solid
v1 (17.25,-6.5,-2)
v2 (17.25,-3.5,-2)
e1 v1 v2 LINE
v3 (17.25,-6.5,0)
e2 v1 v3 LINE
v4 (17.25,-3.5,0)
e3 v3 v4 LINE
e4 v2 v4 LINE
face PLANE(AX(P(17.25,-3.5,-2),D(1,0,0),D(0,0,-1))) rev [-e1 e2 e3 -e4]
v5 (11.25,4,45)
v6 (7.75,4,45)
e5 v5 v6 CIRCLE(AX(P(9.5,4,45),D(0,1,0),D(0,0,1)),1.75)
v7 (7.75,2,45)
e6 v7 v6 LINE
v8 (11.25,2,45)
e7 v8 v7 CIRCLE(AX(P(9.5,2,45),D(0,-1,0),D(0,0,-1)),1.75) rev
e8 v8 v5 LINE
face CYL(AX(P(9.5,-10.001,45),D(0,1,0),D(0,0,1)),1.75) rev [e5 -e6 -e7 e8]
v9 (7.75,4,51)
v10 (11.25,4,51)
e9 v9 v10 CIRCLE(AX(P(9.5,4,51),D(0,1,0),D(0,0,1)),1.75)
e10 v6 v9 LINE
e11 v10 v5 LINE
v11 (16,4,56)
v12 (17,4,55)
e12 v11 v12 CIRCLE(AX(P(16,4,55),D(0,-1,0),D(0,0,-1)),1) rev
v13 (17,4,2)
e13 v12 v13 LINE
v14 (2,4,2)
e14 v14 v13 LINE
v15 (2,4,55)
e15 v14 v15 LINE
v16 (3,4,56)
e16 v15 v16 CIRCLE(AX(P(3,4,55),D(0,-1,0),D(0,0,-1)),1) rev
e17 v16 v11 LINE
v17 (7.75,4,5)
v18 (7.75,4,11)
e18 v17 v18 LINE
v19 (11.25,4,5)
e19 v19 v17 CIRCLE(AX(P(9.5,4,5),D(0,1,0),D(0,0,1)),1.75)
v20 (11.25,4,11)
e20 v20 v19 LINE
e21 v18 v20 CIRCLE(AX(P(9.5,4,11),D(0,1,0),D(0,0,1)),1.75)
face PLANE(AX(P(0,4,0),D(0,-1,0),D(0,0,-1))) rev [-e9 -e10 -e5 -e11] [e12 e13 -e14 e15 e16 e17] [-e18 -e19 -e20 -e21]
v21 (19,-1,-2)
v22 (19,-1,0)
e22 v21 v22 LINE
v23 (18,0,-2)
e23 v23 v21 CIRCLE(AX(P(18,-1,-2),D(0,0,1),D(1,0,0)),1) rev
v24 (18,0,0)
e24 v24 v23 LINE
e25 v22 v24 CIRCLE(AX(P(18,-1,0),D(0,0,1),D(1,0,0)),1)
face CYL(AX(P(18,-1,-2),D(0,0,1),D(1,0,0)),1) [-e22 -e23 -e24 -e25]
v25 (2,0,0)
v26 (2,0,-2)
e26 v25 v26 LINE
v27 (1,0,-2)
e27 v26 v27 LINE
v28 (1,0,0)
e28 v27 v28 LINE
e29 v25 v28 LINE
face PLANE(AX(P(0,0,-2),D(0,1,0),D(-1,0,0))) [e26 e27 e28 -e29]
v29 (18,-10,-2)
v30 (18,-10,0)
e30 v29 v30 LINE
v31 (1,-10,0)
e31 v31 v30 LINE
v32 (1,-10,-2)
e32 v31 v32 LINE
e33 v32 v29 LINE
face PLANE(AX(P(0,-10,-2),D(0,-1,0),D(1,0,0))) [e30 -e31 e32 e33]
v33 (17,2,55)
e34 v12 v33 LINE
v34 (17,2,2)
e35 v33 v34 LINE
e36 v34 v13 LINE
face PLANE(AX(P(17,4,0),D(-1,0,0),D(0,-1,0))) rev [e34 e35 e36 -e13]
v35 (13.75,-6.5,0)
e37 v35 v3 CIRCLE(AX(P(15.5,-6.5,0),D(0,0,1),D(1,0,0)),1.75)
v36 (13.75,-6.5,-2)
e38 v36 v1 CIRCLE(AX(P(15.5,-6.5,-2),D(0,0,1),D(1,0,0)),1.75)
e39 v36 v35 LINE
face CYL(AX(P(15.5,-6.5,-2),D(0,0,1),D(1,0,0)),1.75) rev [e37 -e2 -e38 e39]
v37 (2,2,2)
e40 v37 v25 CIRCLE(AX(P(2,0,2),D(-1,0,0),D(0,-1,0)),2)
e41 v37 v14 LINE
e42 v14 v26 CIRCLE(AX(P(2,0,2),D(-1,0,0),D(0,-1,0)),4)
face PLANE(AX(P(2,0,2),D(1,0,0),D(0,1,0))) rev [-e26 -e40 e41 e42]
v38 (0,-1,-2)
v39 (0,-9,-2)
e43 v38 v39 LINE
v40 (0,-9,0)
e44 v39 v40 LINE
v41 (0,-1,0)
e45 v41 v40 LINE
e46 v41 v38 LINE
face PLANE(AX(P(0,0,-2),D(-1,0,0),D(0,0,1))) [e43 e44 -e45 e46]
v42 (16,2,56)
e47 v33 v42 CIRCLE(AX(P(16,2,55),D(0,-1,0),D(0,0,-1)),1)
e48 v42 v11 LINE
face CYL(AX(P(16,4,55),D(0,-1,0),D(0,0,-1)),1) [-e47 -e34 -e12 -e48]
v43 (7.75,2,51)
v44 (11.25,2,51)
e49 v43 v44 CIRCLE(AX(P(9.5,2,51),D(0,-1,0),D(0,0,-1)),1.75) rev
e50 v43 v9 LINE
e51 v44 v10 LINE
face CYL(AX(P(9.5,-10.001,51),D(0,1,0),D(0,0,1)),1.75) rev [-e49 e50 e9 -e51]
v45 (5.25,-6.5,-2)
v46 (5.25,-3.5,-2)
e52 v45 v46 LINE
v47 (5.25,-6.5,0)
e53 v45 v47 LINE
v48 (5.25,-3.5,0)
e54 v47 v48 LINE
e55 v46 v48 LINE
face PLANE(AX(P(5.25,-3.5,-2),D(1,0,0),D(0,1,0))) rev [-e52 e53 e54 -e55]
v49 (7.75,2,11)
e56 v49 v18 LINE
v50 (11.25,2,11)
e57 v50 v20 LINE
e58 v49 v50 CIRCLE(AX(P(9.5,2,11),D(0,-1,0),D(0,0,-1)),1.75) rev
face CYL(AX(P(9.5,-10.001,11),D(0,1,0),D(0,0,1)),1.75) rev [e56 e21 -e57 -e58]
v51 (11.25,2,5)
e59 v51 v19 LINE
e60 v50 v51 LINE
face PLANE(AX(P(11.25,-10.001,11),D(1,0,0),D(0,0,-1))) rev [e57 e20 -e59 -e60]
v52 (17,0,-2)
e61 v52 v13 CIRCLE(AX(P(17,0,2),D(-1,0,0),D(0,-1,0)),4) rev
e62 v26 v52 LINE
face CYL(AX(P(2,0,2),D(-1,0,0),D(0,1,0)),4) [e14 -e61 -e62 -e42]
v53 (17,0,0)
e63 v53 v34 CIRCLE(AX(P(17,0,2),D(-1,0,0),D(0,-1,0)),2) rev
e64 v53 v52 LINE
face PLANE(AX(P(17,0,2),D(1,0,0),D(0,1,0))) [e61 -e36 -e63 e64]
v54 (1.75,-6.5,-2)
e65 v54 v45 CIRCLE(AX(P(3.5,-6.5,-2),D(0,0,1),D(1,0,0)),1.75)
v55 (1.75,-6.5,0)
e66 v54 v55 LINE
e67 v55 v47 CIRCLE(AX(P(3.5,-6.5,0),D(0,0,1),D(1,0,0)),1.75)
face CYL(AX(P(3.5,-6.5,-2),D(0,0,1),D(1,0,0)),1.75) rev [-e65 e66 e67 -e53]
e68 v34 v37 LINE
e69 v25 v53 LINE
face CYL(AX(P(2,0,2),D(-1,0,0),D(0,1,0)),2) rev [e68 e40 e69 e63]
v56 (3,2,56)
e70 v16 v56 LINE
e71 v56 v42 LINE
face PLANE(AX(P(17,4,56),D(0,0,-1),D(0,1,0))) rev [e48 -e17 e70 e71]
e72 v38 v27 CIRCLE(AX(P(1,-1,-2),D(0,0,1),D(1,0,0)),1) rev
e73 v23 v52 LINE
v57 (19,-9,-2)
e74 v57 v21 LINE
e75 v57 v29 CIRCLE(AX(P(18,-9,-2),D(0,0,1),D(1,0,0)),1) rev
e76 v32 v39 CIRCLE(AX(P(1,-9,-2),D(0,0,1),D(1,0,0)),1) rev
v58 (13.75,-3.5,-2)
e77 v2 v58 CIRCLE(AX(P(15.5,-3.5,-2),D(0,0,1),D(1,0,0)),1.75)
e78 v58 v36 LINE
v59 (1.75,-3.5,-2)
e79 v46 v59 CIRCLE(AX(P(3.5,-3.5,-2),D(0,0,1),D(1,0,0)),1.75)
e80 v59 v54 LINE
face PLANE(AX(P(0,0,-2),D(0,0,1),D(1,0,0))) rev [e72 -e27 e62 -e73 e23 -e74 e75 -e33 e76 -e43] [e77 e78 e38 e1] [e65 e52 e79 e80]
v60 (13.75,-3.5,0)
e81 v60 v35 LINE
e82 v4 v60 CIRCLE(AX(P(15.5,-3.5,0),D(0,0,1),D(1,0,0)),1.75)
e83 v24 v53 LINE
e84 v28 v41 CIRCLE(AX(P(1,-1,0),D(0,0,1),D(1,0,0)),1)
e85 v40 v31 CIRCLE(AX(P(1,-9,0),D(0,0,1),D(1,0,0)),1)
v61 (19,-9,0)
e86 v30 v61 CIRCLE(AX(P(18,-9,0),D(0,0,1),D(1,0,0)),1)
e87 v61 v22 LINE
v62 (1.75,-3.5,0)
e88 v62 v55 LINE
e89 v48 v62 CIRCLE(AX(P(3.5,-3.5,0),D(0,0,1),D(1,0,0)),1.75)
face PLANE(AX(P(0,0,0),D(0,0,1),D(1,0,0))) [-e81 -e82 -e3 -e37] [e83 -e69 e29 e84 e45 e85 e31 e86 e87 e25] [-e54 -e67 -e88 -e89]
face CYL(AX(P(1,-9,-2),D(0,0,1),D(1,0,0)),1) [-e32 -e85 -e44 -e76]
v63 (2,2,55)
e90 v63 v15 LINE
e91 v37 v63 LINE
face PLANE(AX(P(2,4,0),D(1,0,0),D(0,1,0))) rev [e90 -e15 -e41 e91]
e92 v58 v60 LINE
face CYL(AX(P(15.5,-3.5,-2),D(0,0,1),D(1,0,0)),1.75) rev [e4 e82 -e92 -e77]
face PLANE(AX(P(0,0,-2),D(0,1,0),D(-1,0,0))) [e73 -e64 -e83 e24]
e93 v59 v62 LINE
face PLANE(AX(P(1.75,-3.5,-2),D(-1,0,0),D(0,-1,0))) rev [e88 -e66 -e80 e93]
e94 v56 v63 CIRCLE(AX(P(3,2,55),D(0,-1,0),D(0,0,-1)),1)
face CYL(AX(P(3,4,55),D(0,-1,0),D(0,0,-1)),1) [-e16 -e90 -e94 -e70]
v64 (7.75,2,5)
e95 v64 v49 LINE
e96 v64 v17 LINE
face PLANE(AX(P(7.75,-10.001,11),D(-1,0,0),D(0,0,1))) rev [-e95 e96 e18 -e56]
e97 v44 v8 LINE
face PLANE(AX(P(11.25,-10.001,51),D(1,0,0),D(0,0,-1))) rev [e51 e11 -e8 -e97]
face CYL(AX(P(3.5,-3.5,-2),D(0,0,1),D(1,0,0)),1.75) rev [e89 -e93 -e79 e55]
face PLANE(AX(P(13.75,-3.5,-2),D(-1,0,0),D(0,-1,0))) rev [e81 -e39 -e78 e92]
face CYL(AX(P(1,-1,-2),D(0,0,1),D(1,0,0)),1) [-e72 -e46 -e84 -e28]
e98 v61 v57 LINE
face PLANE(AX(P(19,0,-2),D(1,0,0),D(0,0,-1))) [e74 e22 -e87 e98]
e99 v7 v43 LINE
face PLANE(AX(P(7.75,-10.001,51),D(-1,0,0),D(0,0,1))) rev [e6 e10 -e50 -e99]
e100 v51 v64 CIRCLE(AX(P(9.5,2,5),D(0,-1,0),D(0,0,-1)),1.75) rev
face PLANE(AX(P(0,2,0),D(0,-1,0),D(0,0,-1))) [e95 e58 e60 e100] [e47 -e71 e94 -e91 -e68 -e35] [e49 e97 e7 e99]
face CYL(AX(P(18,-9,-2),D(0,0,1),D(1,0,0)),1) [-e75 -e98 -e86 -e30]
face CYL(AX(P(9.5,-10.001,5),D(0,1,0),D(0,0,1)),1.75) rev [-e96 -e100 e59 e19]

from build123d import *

# Parameters (mm, degrees)
CROQUIS1_W             = 19
CROQUIS1_H             = 10
BRIDA_BASE1_DEPTH      = 2
BRIDA_DE_ARISTA1_DEPTH = 15
CORTAR_EXTRUIR1_REACH  = 62.77
REDONDEO1_R            = 1


# Sheet-metal steps are written as plain solids
with BuildPart() as part:
    # Croquis1 → Brida base1 (new body)
    with BuildSketch(Plane.XY):
        with Locations((9.5, -5)):
            Rectangle(CROQUIS1_W, CROQUIS1_H)
        with BuildLine():
            Line((5.25, -3.5), (5.25, -6.5))
            ThreePointArc((5.25, -6.5), (3.5, -8.25), (1.75, -6.5))
            Line((1.75, -6.5), (1.75, -3.5))
            ThreePointArc((1.75, -3.5), (3.5, -1.75), (5.25, -3.5))
        make_face(mode=Mode.SUBTRACT)
        with BuildLine():
            Line((17.25, -3.5), (17.25, -6.5))
            ThreePointArc((17.25, -6.5), (15.5, -8.25), (13.75, -6.5))
            Line((13.75, -6.5), (13.75, -3.5))
            ThreePointArc((13.75, -3.5), (15.5, -1.75), (17.25, -3.5))
        make_face(mode=Mode.SUBTRACT)
    extrude(amount=-BRIDA_BASE1_DEPTH)

    # Brida de arista1 section (across the edge) → Brida de arista1 (add)
    with BuildSketch(Plane(origin=(17, 2, 0), x_dir=(0, -1, 0), z_dir=(-1, 0, 0))):
        with BuildLine():
            Line((-2, 2), (-2, 56))
            Line((-2, 56), (0, 56))
            Line((0, 56), (0, 2))
            ThreePointArc((0, 2), (0.585786438, 0.585786438), (2, 0))
            Line((2, 0), (2, -2))
            ThreePointArc((2, -2), (-0.828427125, -0.828427125), (-2, 2))
        make_face()
    extrude(amount=BRIDA_DE_ARISTA1_DEPTH)

    # Croquis9 → Cortar-Extruir1 (cut, up to next)
    with BuildSketch(Plane(origin=(0, 4, 0), x_dir=(1, 0, 0), z_dir=(0, 1, 0)), mode=Mode.PRIVATE) as cortar_extruir1_sk1:
        with BuildLine():
            Line((7.75, -11), (7.75, -5))
            ThreePointArc((7.75, -5), (9.5, -3.25), (11.25, -5))
            Line((11.25, -5), (11.25, -11))
            ThreePointArc((11.25, -11), (9.5, -12.75), (7.75, -11))
        make_face()
    cortar_extruir1_tool1 = extrude(cortar_extruir1_sk1.sketch, amount=-CORTAR_EXTRUIR1_REACH, mode=Mode.PRIVATE) & part.part
    # Croquis9 → Cortar-Extruir1 (cut, up to next)
    with BuildSketch(Plane(origin=(0, 4, 0), x_dir=(1, 0, 0), z_dir=(0, 1, 0)), mode=Mode.PRIVATE) as cortar_extruir1_sk2:
        with BuildLine():
            Line((7.75, -51), (7.75, -45))
            ThreePointArc((7.75, -45), (9.5, -43.25), (11.25, -45))
            Line((11.25, -45), (11.25, -51))
            ThreePointArc((11.25, -51), (9.5, -52.75), (7.75, -51))
        make_face()
    cortar_extruir1_tool2 = extrude(cortar_extruir1_sk2.sketch, amount=-CORTAR_EXTRUIR1_REACH, mode=Mode.PRIVATE) & part.part
    add(cortar_extruir1_tool1.solids().sort_by_distance((9.5, 4, 8))[0], mode=Mode.SUBTRACT)
    add(cortar_extruir1_tool2.solids().sort_by_distance((9.5, 4, 48))[0], mode=Mode.SUBTRACT)

    # Redondeo1
    redondeo1_edges = [part.edges().sort_by_distance(p)[0] for p in [
        (17, 3, 56),
        (2, 3, 56),
        (0, 0, -1),
        (19, 0, -1),
        (19, -10, -1),
        (0, -10, -1),
    ]]
    fillet(redondeo1_edges, radius=REDONDEO1_R)


solid = part.part
